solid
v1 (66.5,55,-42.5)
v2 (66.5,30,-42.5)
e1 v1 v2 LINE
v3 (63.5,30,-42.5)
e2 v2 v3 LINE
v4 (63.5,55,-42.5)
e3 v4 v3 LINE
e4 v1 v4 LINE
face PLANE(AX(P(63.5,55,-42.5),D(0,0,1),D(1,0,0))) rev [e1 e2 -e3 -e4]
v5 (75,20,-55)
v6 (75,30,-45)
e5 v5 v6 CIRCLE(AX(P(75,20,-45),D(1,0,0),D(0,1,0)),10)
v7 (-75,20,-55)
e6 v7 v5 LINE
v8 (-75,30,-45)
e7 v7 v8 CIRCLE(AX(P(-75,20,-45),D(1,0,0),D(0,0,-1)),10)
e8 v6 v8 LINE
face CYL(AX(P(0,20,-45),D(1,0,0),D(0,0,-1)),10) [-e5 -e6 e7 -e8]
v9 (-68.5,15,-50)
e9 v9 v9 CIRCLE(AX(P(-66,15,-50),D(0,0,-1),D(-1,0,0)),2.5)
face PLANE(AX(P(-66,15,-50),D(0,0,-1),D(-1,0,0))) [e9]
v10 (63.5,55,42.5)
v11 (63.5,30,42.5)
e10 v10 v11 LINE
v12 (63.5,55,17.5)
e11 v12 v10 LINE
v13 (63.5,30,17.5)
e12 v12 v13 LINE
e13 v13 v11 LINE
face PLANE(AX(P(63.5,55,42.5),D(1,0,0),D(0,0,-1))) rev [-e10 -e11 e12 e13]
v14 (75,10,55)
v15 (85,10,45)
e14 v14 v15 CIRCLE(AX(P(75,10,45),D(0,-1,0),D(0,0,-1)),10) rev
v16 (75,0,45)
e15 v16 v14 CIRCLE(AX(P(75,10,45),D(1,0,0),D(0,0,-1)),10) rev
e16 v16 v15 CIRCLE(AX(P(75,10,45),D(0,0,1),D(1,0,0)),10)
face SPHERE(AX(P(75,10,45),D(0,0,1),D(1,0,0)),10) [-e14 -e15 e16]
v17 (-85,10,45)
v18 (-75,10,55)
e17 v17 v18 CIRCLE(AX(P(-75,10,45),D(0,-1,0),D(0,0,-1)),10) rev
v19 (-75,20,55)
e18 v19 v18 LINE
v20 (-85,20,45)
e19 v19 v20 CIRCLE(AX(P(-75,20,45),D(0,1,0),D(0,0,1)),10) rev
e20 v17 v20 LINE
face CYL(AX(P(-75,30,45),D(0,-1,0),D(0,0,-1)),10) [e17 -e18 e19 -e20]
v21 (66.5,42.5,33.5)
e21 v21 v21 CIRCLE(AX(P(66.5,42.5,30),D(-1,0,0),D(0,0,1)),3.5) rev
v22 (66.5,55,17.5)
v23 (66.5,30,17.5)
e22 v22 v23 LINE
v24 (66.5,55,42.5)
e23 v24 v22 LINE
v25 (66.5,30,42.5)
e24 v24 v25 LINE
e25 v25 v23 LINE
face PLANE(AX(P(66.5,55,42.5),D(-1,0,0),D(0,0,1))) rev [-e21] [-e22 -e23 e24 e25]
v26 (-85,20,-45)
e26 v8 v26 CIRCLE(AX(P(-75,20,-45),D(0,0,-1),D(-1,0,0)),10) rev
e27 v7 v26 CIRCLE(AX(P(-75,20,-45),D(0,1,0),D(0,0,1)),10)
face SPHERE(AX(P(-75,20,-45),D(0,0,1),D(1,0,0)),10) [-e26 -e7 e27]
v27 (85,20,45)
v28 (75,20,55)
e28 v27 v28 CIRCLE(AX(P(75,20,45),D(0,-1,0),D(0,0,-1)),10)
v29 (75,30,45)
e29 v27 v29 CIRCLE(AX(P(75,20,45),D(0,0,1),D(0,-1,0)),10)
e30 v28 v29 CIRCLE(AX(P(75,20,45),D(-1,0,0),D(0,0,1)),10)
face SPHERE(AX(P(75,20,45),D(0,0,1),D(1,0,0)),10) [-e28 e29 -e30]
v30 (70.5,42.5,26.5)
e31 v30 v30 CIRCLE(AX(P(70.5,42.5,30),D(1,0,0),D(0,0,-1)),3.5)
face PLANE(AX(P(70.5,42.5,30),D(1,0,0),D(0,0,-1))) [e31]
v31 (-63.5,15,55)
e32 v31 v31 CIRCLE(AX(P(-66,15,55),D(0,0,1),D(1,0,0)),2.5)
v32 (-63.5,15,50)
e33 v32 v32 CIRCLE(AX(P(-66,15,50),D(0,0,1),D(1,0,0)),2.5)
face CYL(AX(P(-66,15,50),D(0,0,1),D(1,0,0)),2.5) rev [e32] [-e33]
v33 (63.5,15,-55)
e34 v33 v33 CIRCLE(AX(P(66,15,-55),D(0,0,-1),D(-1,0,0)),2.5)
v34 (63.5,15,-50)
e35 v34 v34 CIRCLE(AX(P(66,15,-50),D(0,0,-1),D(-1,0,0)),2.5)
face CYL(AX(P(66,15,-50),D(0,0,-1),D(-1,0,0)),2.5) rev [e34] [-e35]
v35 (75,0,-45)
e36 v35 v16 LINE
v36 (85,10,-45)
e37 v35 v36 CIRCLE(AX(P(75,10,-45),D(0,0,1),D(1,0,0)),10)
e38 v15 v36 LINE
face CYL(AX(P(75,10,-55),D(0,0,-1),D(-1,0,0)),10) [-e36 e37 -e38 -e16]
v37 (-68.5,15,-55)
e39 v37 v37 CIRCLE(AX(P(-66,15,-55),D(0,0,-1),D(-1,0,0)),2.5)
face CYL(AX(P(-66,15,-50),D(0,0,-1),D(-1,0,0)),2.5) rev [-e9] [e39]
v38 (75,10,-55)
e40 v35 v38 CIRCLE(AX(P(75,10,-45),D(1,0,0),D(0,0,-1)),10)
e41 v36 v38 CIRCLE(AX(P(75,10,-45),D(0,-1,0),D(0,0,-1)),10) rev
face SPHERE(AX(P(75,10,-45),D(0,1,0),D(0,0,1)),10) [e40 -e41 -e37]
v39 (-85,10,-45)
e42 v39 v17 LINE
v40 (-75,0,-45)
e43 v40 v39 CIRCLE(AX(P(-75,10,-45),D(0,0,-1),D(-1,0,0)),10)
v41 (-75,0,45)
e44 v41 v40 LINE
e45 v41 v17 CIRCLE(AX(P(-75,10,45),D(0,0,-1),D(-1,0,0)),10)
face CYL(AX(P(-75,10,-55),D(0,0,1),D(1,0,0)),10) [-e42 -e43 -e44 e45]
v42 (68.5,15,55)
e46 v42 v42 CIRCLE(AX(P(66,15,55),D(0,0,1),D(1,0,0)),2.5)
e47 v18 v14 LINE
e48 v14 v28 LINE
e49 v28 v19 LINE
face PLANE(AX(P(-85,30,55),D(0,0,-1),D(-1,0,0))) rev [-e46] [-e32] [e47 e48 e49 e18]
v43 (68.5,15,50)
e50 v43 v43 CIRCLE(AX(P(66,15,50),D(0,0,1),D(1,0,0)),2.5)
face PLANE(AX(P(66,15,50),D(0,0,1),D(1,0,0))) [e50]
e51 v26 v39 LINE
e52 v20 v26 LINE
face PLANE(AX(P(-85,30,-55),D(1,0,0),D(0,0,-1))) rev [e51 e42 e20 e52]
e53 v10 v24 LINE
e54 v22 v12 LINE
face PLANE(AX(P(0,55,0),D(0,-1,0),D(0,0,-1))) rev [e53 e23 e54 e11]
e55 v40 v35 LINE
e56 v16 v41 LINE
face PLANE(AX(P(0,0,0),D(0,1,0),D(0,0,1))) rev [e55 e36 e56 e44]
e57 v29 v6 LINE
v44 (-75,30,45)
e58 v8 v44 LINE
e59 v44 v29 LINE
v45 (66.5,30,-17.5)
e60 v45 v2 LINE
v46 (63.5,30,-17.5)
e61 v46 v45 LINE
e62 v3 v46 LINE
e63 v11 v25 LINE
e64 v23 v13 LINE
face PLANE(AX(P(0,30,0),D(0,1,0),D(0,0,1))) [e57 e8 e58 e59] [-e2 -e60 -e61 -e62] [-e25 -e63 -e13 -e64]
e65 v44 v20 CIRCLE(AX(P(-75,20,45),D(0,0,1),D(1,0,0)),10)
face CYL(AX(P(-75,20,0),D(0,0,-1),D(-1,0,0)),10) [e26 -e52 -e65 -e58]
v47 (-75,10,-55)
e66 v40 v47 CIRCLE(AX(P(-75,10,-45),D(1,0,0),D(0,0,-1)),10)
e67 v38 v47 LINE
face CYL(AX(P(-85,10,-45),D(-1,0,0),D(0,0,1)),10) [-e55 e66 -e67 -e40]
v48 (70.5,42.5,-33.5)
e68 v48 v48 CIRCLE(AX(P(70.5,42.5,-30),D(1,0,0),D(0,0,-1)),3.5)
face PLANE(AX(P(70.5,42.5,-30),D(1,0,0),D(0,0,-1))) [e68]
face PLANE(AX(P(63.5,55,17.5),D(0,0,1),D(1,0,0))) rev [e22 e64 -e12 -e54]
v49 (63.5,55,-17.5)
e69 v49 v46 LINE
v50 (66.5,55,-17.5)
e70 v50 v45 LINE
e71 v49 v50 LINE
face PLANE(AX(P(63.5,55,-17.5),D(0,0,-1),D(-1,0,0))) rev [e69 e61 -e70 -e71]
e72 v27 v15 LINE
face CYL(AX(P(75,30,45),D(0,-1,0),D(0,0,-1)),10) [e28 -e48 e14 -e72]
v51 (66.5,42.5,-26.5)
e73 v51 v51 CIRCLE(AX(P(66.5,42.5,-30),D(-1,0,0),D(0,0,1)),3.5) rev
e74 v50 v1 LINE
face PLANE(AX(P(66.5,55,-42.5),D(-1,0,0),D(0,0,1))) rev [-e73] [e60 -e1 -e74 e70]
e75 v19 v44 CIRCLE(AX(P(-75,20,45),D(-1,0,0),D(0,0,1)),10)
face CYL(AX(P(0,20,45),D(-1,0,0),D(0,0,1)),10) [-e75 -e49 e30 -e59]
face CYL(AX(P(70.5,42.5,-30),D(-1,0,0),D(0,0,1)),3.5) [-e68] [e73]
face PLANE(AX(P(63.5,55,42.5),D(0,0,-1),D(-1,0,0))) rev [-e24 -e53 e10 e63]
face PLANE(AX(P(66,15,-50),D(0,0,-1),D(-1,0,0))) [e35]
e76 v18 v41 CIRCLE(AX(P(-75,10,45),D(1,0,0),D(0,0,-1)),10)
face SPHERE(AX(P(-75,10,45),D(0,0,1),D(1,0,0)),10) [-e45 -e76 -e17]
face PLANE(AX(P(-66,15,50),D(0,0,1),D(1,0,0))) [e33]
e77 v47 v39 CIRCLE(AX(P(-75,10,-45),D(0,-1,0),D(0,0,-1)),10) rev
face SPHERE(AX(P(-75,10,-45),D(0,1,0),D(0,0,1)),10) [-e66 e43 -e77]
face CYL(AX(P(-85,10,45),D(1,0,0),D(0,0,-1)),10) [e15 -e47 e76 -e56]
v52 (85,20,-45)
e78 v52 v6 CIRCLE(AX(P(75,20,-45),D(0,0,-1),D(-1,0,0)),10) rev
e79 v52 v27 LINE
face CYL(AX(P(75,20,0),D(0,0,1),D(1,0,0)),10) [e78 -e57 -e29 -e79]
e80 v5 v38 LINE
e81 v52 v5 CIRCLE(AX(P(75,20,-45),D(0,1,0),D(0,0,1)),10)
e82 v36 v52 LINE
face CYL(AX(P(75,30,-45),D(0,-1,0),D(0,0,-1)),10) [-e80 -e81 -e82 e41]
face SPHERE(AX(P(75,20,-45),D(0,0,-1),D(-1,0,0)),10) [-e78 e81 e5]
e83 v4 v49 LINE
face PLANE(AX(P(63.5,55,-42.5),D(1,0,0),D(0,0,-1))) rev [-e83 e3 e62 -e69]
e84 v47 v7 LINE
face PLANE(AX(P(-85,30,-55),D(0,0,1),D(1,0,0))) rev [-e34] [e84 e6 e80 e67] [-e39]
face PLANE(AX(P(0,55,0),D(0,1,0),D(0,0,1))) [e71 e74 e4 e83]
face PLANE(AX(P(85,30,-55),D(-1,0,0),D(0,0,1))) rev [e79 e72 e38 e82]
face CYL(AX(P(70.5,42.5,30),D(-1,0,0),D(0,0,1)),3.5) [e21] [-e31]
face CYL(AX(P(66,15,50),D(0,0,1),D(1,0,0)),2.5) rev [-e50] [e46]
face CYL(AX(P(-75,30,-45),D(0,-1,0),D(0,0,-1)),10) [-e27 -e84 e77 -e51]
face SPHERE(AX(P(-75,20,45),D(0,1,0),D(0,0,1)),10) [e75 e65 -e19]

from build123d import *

# Parameters (mm, degrees)
SKETCH1_W           = 170
SKETCH1_H           = 110
BOSS_EXTRUDE1_DEPTH = 30
FILLET2_R           = 10
FILLET3_R           = 10
FILLET4_R           = 10
SKETCH3_R           = 2.5
CUT_EXTRUDE1_DEPTH  = 5
CUT_EXTRUDE2_START  = -5
SKETCH5_R           = 2.5
CUT_EXTRUDE2_DEPTH  = 5
SKETCH6_W           = 3
SKETCH6_H           = 25
BOSS_EXTRUDE2_DEPTH = 25
SKETCH7_R           = 3.5
BOSS_EXTRUDE3_DEPTH = 4
SKETCH8_R           = 3.5
BOSS_EXTRUDE4_DEPTH = 4


with BuildPart() as part:
    # Sketch1 → Boss-Extrude1 (new body)
    with BuildSketch(Plane(origin=(0, 0, 0), x_dir=(1, 0, 0), z_dir=(0, 1, 0))):
        Rectangle(SKETCH1_W, SKETCH1_H)
    extrude(amount=BOSS_EXTRUDE1_DEPTH)

    # Fillet2
    fillet2_edges = [part.edges().sort_by_distance(p)[0] for p in [
        (-85, 30, 0),
        (0, 30, 55),
        (0, 0, 55),
        (85, 15, 55),
        (-85, 15, 55),
    ]]
    fillet(fillet2_edges, radius=FILLET2_R)

    # Fillet3
    # the kernel refuses this fillet: 10 mm, written as the material it takes off along each edge
    with BuildSketch(Plane(origin=(75, 20, 45), x_dir=(1, 0, 0), z_dir=(0, 1, 0))) as fillet3_piece_1_section:
        Polygon((0, 0), (FILLET3_R, 0), (FILLET3_R, -FILLET3_R), (0, -FILLET3_R), align=None)
    fillet3_piece_1 = extrude(amount=FILLET3_R, mode=Mode.PRIVATE)
    fillet3_piece_1 = fillet3_piece_1 - Plane(origin=(75, 20, 45), x_dir=(-0.7071067811865475, 0, -0.7071067811865475), z_dir=(0, 1, 0)) * Sphere(FILLET3_R, mode=Mode.PRIVATE)
    add(fillet3_piece_1, mode=Mode.SUBTRACT)
    with BuildSketch(Plane(origin=(75, 20, -45), x_dir=(0, 1, 0), z_dir=(0, 0, -1))) as fillet3_piece_2_section:
        Polygon((0, 0), (FILLET3_R, 0), (FILLET3_R, FILLET3_R), (0, FILLET3_R), align=None)
    fillet3_piece_2 = extrude(amount=FILLET3_R, mode=Mode.PRIVATE)
    fillet3_piece_2 = fillet3_piece_2 - Plane(origin=(75, 20, -45), x_dir=(-0.7071067811865475, -0.7071067811865475, 0), z_dir=(0, 0, -1)) * Sphere(FILLET3_R, mode=Mode.PRIVATE)
    add(fillet3_piece_2, mode=Mode.SUBTRACT)
    with BuildSketch(Plane(origin=(-85, -25, -55), x_dir=(1, 0, 0), z_dir=(0, 1, 0))) as fillet3_piece_3:
        with BuildLine():
            CenterArc((FILLET3_R, -FILLET3_R), FILLET3_R, 90, 90)
            Line((0, -FILLET3_R), (0, 0))
            Line((0, 0), (FILLET3_R, 0))
        make_face()
    extrude(amount=45, mode=Mode.SUBTRACT)
    with BuildSketch(Plane(origin=(85, 30, -45), x_dir=(-1, 0, 0), z_dir=(0, 0, 1))) as fillet3_piece_4:
        with BuildLine():
            CenterArc((FILLET3_R, FILLET3_R), FILLET3_R, 180, 90)
            Line((0, FILLET3_R), (0, 0))
            Line((0, 0), (FILLET3_R, 0))
        make_face()
    extrude(amount=90, mode=Mode.SUBTRACT)
    with BuildSketch(Plane(origin=(-75, 20, -55), x_dir=(-1, 0, 0), z_dir=(0, -1, 0))) as fillet3_piece_5:
        with BuildLine():
            CenterArc((10 - FILLET3_R, -FILLET3_R), FILLET3_R, 0, 90)
            Line((10, -FILLET3_R), (10, 0))
            Line((10, 0), (10 - FILLET3_R, 0))
        make_face()
    revolve(axis=Axis((-75, 20, -55), (0, 0, -1)), revolution_arc=90, mode=Mode.SUBTRACT)
    with BuildSketch(Plane(origin=(85, -25, -55), x_dir=(-1, 0, 0), z_dir=(0, 1, 0))) as fillet3_piece_6:
        with BuildLine():
            CenterArc((FILLET3_R, FILLET3_R), FILLET3_R, 180, 90)
            Line((0, FILLET3_R), (0, 0))
            Line((0, 0), (FILLET3_R, 0))
        make_face()
    extrude(amount=45, mode=Mode.SUBTRACT)
    with BuildSketch(Plane(origin=(-75, 30, -55), x_dir=(0, -1, 0), z_dir=(1, 0, 0))) as fillet3_piece_7:
        with BuildLine():
            CenterArc((FILLET3_R, -FILLET3_R), FILLET3_R, 90, 90)
            Line((0, -FILLET3_R), (0, 0))
            Line((0, 0), (FILLET3_R, 0))
        make_face()
    extrude(amount=150, mode=Mode.SUBTRACT)

    # Fillet4
    # the kernel refuses this fillet: 10 mm, written as the material it takes off along each edge
    with BuildSketch(Plane(origin=(75, 10, 45), x_dir=(1, 0, 0), z_dir=(0, -1, 0))) as fillet4_piece_1_section:
        Polygon((0, 0), (FILLET4_R, 0), (FILLET4_R, FILLET4_R), (0, FILLET4_R), align=None)
    fillet4_piece_1 = extrude(amount=FILLET4_R, mode=Mode.PRIVATE)
    fillet4_piece_1 = fillet4_piece_1 - Plane(origin=(75, 10, 45), x_dir=(-0.7071067811865475, 0, -0.7071067811865475), z_dir=(0, -1, 0)) * Sphere(FILLET4_R, mode=Mode.PRIVATE)
    add(fillet4_piece_1, mode=Mode.SUBTRACT)
    with BuildSketch(Plane(origin=(-75, 10, 45), x_dir=(-1, 0, 0), z_dir=(0, -1, 0))) as fillet4_piece_2_section:
        Polygon((0, 0), (FILLET4_R, 0), (FILLET4_R, -FILLET4_R), (0, -FILLET4_R), align=None)
    fillet4_piece_2 = extrude(amount=FILLET4_R, mode=Mode.PRIVATE)
    fillet4_piece_2 = fillet4_piece_2 - Plane(origin=(-75, 10, 45), x_dir=(0.7071067811865475, 0, -0.7071067811865475), z_dir=(0, -1, 0)) * Sphere(FILLET4_R, mode=Mode.PRIVATE)
    add(fillet4_piece_2, mode=Mode.SUBTRACT)
    with BuildSketch(Plane(origin=(85, 0, -45), x_dir=(-1, 0, 0), z_dir=(0, 0, 1)), Plane(origin=(-85, 0, 45), x_dir=(1, 0, 0), z_dir=(0, 0, -1))) as fillet4_piece_3:
        with BuildLine():
            CenterArc((FILLET4_R, -FILLET4_R), FILLET4_R, 90, 90)
            Line((0, -FILLET4_R), (0, 0))
            Line((0, 0), (FILLET4_R, 0))
        make_face()
    extrude(amount=90, mode=Mode.SUBTRACT)
    with BuildSketch(Plane(origin=(-75, 0, -55), x_dir=(0, 1, 0), z_dir=(1, 0, 0))) as fillet4_piece_4:
        with BuildLine():
            CenterArc((FILLET4_R, FILLET4_R), FILLET4_R, 180, 90)
            Line((0, FILLET4_R), (0, 0))
            Line((0, 0), (FILLET4_R, 0))
        make_face()
    extrude(amount=150, mode=Mode.SUBTRACT)
    with BuildSketch(Plane(origin=(75, 0, -45), x_dir=(0, 0, -1), z_dir=(-1, 0, 0))) as fillet4_piece_5:
        with BuildLine():
            CenterArc((10 - FILLET4_R, -FILLET4_R), FILLET4_R, 0, 90)
            Line((10, -FILLET4_R), (10, 0))
            Line((10, 0), (10 - FILLET4_R, 0))
        make_face()
    revolve(axis=Axis((75, 0, -45), (0, -1, 0)), revolution_arc=90, mode=Mode.SUBTRACT)
    with BuildSketch(Plane(origin=(-75, 0, -45), x_dir=(-1, 0, 0), z_dir=(0, 0, 1))) as fillet4_piece_6:
        with BuildLine():
            CenterArc((10 - FILLET4_R, -FILLET4_R), FILLET4_R, 0, 90)
            Line((10, -FILLET4_R), (10, 0))
            Line((10, 0), (10 - FILLET4_R, 0))
        make_face()
    revolve(axis=Axis((-75, 0, -45), (0, -1, 0)), revolution_arc=90, mode=Mode.SUBTRACT)

    # Sketch3 → Cut-Extrude1 (cut)
    with BuildSketch(Plane(origin=(0, 0, -55), x_dir=(-1, 0, 0), z_dir=(0, 0, -1))):
        with Locations((-66, 15)):
            Circle(SKETCH3_R)
        with Locations((66, 15)):
            Circle(SKETCH3_R)
    extrude(amount=-CUT_EXTRUDE1_DEPTH, mode=Mode.SUBTRACT)

    # Sketch5 → Cut-Extrude2 (cut)
    with BuildSketch(Plane.XY.offset(55).offset(CUT_EXTRUDE2_START)):
        with Locations(Location((-66, 15, 0), (0, 0, 180))):
            Circle(SKETCH5_R)
        with Locations(Location((66, 15, 0), (0, 0, 180))):
            Circle(SKETCH5_R)
    extrude(amount=CUT_EXTRUDE2_DEPTH, mode=Mode.SUBTRACT)

    # Sketch6 → Boss-Extrude2 (add)
    with BuildSketch(Plane(origin=(0, 30, 0), x_dir=(1, 0, 0), z_dir=(0, 1, 0))):
        with Locations((65, 30)):
            Rectangle(SKETCH6_W, SKETCH6_H)
        with Locations((65, -30)):
            Rectangle(SKETCH6_W, SKETCH6_H)
    extrude(amount=BOSS_EXTRUDE2_DEPTH)

    # Sketch7 → Boss-Extrude3 (add)
    with BuildSketch(Plane(origin=(66.5, 0, 0), x_dir=(0, 0, -1), z_dir=(1, 0, 0))):
        with Locations(Location((-30, 42.5, 0), (0, 0, 180))):
            Circle(SKETCH7_R)
    extrude(amount=BOSS_EXTRUDE3_DEPTH)

    # Sketch8 → Boss-Extrude4 (add)
    with BuildSketch(Plane(origin=(66.5, 0, 0), x_dir=(0, 0, -1), z_dir=(1, 0, 0))):
        with Locations(Location((30, 42.5, 0), (0, 0, 180))):
            Circle(SKETCH8_R)
    extrude(amount=BOSS_EXTRUDE4_DEPTH)


solid = part.part
